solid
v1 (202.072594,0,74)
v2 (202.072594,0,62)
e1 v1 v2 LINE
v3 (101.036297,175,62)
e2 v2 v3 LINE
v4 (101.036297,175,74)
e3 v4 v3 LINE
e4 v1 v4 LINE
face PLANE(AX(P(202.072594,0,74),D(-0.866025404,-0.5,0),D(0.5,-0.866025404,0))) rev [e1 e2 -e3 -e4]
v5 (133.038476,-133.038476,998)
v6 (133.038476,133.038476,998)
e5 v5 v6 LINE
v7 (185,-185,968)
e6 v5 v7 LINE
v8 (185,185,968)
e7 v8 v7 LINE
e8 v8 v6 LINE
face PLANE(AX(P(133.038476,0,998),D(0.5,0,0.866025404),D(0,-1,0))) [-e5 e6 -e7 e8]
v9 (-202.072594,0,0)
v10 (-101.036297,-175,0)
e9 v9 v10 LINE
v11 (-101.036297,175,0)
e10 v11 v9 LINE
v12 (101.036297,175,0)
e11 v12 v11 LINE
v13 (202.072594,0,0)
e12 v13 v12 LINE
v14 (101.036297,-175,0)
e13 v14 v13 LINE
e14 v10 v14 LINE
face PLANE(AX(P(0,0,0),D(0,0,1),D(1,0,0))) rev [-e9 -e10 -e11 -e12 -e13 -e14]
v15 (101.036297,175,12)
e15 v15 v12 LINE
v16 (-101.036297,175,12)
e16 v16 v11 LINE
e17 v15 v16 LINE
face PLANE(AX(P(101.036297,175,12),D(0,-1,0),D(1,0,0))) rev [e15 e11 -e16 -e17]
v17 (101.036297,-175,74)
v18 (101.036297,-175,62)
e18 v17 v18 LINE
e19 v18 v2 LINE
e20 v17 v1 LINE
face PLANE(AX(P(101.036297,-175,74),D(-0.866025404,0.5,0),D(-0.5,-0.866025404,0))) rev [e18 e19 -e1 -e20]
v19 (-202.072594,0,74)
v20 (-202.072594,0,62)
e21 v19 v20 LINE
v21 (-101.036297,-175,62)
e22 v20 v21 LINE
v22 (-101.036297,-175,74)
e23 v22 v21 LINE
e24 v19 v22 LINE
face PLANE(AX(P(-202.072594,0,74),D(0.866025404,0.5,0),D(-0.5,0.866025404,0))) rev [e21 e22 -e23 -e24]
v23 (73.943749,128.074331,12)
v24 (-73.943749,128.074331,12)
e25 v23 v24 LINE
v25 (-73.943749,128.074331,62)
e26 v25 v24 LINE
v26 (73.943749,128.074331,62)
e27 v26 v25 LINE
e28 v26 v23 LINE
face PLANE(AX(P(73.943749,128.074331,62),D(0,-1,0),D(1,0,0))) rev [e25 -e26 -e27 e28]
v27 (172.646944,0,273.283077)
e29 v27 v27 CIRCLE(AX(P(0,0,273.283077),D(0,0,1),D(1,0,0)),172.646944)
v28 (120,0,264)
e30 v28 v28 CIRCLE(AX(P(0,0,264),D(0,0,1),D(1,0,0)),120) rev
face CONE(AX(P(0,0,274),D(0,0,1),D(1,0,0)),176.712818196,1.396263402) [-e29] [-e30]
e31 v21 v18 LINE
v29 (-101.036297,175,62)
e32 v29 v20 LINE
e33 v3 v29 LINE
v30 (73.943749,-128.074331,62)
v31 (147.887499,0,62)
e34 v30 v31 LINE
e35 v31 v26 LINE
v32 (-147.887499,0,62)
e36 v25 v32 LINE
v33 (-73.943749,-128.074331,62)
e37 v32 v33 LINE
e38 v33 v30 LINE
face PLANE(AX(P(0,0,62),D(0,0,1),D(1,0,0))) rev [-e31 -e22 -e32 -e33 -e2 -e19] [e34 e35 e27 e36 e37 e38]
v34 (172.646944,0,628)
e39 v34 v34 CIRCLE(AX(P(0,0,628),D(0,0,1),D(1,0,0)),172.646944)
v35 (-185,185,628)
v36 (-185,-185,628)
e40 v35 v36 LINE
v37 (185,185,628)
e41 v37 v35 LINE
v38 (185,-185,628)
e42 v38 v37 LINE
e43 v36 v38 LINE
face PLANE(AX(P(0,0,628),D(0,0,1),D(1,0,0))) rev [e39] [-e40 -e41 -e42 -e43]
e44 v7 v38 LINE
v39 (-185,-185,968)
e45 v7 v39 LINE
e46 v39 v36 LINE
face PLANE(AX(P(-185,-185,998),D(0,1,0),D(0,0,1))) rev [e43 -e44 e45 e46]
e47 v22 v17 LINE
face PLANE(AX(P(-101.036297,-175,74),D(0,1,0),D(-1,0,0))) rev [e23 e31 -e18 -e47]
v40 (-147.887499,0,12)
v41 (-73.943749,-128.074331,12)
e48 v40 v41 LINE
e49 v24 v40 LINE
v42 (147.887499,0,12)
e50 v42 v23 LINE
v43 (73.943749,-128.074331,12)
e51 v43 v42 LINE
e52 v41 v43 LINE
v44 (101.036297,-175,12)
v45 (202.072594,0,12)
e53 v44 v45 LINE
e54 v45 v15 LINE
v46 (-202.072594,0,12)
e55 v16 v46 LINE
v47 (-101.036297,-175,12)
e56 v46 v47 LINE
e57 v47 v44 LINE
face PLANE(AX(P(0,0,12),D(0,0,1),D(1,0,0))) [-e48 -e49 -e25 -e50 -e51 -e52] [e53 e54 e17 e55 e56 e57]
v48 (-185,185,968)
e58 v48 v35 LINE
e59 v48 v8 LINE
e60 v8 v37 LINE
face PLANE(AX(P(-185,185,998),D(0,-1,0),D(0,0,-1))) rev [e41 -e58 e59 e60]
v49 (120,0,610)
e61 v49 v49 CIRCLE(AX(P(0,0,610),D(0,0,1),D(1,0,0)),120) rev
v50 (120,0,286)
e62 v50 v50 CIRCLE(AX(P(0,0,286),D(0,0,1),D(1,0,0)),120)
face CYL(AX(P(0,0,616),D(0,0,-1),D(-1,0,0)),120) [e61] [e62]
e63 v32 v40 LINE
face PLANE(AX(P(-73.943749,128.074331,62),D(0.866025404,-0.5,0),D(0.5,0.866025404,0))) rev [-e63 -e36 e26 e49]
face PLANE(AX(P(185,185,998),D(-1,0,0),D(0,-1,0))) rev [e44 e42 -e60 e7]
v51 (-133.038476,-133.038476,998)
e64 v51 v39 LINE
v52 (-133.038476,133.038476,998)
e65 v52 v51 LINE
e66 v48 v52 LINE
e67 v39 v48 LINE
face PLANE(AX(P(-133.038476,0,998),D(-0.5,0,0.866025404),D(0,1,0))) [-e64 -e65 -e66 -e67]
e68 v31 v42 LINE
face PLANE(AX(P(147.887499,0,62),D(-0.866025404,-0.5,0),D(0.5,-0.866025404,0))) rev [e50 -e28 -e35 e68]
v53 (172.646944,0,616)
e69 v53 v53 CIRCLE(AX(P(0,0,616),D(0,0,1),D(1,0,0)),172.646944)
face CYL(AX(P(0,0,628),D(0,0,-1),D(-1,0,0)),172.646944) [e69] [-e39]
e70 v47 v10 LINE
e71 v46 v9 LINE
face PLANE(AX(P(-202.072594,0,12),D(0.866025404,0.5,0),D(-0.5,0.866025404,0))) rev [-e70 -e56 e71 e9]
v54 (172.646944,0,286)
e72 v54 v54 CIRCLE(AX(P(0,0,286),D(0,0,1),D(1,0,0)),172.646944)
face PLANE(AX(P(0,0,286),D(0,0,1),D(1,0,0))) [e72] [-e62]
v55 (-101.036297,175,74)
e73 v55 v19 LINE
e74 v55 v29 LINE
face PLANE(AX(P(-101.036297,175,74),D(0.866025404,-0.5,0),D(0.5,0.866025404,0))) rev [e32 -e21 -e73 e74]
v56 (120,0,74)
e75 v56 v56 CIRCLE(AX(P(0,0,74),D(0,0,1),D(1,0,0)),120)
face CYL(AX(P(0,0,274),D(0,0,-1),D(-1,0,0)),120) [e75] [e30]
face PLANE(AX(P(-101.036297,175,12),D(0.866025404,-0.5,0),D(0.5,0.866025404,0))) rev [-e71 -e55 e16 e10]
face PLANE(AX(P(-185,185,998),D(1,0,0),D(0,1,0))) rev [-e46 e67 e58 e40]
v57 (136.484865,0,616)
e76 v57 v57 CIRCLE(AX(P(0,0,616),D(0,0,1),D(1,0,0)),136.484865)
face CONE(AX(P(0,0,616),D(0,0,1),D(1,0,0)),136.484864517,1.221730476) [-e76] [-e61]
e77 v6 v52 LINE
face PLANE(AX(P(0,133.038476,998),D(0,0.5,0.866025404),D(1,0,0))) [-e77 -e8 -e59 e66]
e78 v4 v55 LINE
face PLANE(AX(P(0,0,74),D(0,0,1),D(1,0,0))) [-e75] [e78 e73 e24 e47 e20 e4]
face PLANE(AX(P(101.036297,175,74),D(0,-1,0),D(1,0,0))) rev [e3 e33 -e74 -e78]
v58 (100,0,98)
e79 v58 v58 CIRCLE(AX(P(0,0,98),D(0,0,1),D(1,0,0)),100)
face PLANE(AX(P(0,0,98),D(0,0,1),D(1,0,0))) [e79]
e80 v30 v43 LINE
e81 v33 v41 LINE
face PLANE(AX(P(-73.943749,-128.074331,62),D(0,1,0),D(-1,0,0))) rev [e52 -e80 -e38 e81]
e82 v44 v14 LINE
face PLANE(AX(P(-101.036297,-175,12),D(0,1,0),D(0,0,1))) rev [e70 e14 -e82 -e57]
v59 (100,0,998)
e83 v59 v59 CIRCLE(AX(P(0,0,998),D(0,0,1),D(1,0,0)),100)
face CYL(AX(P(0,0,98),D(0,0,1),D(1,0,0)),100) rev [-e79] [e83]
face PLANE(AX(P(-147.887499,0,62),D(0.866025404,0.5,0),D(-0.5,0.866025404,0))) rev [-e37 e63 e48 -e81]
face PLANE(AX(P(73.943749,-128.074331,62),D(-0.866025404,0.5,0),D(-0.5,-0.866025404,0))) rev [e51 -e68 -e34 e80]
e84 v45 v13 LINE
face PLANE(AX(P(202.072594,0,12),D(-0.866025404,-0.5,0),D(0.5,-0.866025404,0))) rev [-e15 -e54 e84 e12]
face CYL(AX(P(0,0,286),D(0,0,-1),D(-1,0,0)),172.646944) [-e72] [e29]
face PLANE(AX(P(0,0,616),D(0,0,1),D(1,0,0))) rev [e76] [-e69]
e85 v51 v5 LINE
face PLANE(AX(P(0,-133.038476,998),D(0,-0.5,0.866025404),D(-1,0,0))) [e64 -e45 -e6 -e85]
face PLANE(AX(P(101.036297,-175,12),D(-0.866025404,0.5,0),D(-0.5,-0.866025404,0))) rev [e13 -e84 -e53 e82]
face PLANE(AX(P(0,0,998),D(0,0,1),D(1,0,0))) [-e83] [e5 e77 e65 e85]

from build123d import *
from OCP.BRepFilletAPI import BRepFilletAPI_MakeChamfer

# Parameters (mm, degrees)
BOSS_EXTRUDE1_DEPTH = 12
BOSS_EXTRUDE2_DEPTH = 50
BOSS_EXTRUDE3_DEPTH = 12
SKETCH4_R           = 120
BOSS_EXTRUDE4_DEPTH = 200
SKETCH5_R           = 172.646944325
BOSS_EXTRUDE5_DEPTH = 12
CHAMFER1_SIZE       = 56.712818196
CHAMFER1_SIZE_2     = 10
SKETCH6_R           = 120
BOSS_EXTRUDE6_DEPTH = 330
SKETCH8_R           = 172.646944325
BOSS_EXTRUDE7_DEPTH = 12
CHAMFER2_SIZE       = 6
CHAMFER2_SIZE2      = 16.484864517
SKETCH9_W           = 370
SKETCH9_H           = 370
BOSS_EXTRUDE8_DEPTH = 370
SKETCH10_R          = 100
CUT_EXTRUDE1_DEPTH  = 900
CHAMFER3_SIZE       = 30
CHAMFER3_SIZE2      = 51.961524227


with BuildPart() as part:
    # Sketch1 → Boss-Extrude1 (new body)
    with BuildSketch(Plane.XY):
        Polygon((202.072594216, 0), (101.036297108, 175), (-101.036297108, 175), (-202.072594216, 0), (-101.036297108, -175), (101.036297108, -175), align=None)
    extrude(amount=BOSS_EXTRUDE1_DEPTH)

    # Sketch2 → Boss-Extrude2 (add)
    with BuildSketch(Plane.XY.offset(12)):
        Polygon((147.887498821, 0), (73.943749411, 128.074330881), (-73.943749411, 128.074330881), (-147.887498821, 0), (-73.943749411, -128.074330881), (73.943749411, -128.074330881), align=None)
    extrude(amount=BOSS_EXTRUDE2_DEPTH)

    # Sketch3 → Boss-Extrude3 (add)
    with BuildSketch(Plane.XY.offset(62)):
        Polygon((202.072594216, 0), (101.036297108, 175), (-101.036297108, 175), (-202.072594216, 0), (-101.036297108, -175), (101.036297108, -175), align=None)
    extrude(amount=BOSS_EXTRUDE3_DEPTH)

    # Sketch4 → Boss-Extrude4 (add)
    with BuildSketch(Plane.XY.offset(74)):
        Circle(SKETCH4_R)
    extrude(amount=BOSS_EXTRUDE4_DEPTH)

    # Sketch5 → Boss-Extrude5 (add)
    with BuildSketch(Plane.XY.offset(274)):
        Circle(SKETCH5_R)
    extrude(amount=BOSS_EXTRUDE5_DEPTH)

    # Chamfer1
    # the kernel refuses this chamfer: 56.712818196, 10 mm, written as the material it adds along each edge
    with BuildSketch(Plane(origin=(0, 0, 274), x_dir=(1, 0, 0), z_dir=(0, -1, 0))) as chamfer1_piece_1_section:
        Polygon((120 + CHAMFER1_SIZE, 0), (120, -CHAMFER1_SIZE_2), (120, 0), align=None)
    chamfer1_piece_1 = revolve(axis=Axis((0, 0, 274), (0, 0, 1)), mode=Mode.PRIVATE)
    chamfer1_piece_1 = chamfer1_piece_1 & Plane(origin=(0, 0, 269.114385433), x_dir=(1, 0, 0), z_dir=(0, 0, -1)) * Cylinder(172.646944325, 707, mode=Mode.PRIVATE)
    add(chamfer1_piece_1)

    # Sketch6 → Boss-Extrude6 (add)
    with BuildSketch(Plane.XY.offset(286)):
        Circle(SKETCH6_R)
    extrude(amount=BOSS_EXTRUDE6_DEPTH)

    # Sketch8 → Boss-Extrude7 (add)
    with BuildSketch(Plane.XY.offset(616)):
        Circle(SKETCH8_R)
    extrude(amount=BOSS_EXTRUDE7_DEPTH)

    # Chamfer2
    chamfer2_edges = [part.edges().sort_by_distance(p)[0] for p in [
        (-120, 0, 616),
    ]]
    chamfer2_side = [part.faces().sort_by_distance(p)[0] for p in [
        (-120, 0, 451),
    ]]
    chamfer(chamfer2_edges, length=CHAMFER2_SIZE, length2=CHAMFER2_SIZE2, reference=chamfer2_side[0])

    # Sketch9 → Boss-Extrude8 (add)
    with BuildSketch(Plane.XY.offset(628)):
        Rectangle(SKETCH9_W, SKETCH9_H)
    extrude(amount=BOSS_EXTRUDE8_DEPTH)

    # Sketch10 → Cut-Extrude1 (cut)
    with BuildSketch(Plane.XY.offset(998)):
        Circle(SKETCH10_R)
    extrude(amount=-CUT_EXTRUDE1_DEPTH, mode=Mode.SUBTRACT)

    # Chamfer3: one chamfer whose edges measure the first distance from different faces: ONE call of the kernel's chamfer builder (chamfer() names one face for all edges)
    chamfer3_edges_1 = [part.edges().sort_by_distance(p)[0] for p in [
        (185, 0, 998),
    ]]
    chamfer3_side_1 = [part.faces().sort_by_distance(p)[0] for p in [
        (185, 0, 813),
    ]]
    chamfer3_edges_2 = [part.edges().sort_by_distance(p)[0] for p in [
        (0, 185, 998),
    ]]
    chamfer3_side_2 = [part.faces().sort_by_distance(p)[0] for p in [
        (0, 185, 813),
    ]]
    chamfer3_edges_3 = [part.edges().sort_by_distance(p)[0] for p in [
        (-185, 0, 998),
    ]]
    chamfer3_side_3 = [part.faces().sort_by_distance(p)[0] for p in [
        (-185, 0, 813),
    ]]
    chamfer3_edges_4 = [part.edges().sort_by_distance(p)[0] for p in [
        (0, -185, 998),
    ]]
    chamfer3_side_4 = [part.faces().sort_by_distance(p)[0] for p in [
        (0, -185, 813),
    ]]
    chamfer3 = BRepFilletAPI_MakeChamfer(part.part.solid().wrapped)
    for e in chamfer3_edges_1:
        chamfer3.Add(CHAMFER3_SIZE, CHAMFER3_SIZE2, e.wrapped, chamfer3_side_1[0].wrapped)  # the first distance lies on this face
    for e in chamfer3_edges_2:
        chamfer3.Add(CHAMFER3_SIZE, CHAMFER3_SIZE2, e.wrapped, chamfer3_side_2[0].wrapped)  # the first distance lies on this face
    for e in chamfer3_edges_3:
        chamfer3.Add(CHAMFER3_SIZE, CHAMFER3_SIZE2, e.wrapped, chamfer3_side_3[0].wrapped)  # the first distance lies on this face
    for e in chamfer3_edges_4:
        chamfer3.Add(CHAMFER3_SIZE, CHAMFER3_SIZE2, e.wrapped, chamfer3_side_4[0].wrapped)  # the first distance lies on this face
    add(Compound.cast(chamfer3.Shape()), mode=Mode.REPLACE)


solid = part.part
